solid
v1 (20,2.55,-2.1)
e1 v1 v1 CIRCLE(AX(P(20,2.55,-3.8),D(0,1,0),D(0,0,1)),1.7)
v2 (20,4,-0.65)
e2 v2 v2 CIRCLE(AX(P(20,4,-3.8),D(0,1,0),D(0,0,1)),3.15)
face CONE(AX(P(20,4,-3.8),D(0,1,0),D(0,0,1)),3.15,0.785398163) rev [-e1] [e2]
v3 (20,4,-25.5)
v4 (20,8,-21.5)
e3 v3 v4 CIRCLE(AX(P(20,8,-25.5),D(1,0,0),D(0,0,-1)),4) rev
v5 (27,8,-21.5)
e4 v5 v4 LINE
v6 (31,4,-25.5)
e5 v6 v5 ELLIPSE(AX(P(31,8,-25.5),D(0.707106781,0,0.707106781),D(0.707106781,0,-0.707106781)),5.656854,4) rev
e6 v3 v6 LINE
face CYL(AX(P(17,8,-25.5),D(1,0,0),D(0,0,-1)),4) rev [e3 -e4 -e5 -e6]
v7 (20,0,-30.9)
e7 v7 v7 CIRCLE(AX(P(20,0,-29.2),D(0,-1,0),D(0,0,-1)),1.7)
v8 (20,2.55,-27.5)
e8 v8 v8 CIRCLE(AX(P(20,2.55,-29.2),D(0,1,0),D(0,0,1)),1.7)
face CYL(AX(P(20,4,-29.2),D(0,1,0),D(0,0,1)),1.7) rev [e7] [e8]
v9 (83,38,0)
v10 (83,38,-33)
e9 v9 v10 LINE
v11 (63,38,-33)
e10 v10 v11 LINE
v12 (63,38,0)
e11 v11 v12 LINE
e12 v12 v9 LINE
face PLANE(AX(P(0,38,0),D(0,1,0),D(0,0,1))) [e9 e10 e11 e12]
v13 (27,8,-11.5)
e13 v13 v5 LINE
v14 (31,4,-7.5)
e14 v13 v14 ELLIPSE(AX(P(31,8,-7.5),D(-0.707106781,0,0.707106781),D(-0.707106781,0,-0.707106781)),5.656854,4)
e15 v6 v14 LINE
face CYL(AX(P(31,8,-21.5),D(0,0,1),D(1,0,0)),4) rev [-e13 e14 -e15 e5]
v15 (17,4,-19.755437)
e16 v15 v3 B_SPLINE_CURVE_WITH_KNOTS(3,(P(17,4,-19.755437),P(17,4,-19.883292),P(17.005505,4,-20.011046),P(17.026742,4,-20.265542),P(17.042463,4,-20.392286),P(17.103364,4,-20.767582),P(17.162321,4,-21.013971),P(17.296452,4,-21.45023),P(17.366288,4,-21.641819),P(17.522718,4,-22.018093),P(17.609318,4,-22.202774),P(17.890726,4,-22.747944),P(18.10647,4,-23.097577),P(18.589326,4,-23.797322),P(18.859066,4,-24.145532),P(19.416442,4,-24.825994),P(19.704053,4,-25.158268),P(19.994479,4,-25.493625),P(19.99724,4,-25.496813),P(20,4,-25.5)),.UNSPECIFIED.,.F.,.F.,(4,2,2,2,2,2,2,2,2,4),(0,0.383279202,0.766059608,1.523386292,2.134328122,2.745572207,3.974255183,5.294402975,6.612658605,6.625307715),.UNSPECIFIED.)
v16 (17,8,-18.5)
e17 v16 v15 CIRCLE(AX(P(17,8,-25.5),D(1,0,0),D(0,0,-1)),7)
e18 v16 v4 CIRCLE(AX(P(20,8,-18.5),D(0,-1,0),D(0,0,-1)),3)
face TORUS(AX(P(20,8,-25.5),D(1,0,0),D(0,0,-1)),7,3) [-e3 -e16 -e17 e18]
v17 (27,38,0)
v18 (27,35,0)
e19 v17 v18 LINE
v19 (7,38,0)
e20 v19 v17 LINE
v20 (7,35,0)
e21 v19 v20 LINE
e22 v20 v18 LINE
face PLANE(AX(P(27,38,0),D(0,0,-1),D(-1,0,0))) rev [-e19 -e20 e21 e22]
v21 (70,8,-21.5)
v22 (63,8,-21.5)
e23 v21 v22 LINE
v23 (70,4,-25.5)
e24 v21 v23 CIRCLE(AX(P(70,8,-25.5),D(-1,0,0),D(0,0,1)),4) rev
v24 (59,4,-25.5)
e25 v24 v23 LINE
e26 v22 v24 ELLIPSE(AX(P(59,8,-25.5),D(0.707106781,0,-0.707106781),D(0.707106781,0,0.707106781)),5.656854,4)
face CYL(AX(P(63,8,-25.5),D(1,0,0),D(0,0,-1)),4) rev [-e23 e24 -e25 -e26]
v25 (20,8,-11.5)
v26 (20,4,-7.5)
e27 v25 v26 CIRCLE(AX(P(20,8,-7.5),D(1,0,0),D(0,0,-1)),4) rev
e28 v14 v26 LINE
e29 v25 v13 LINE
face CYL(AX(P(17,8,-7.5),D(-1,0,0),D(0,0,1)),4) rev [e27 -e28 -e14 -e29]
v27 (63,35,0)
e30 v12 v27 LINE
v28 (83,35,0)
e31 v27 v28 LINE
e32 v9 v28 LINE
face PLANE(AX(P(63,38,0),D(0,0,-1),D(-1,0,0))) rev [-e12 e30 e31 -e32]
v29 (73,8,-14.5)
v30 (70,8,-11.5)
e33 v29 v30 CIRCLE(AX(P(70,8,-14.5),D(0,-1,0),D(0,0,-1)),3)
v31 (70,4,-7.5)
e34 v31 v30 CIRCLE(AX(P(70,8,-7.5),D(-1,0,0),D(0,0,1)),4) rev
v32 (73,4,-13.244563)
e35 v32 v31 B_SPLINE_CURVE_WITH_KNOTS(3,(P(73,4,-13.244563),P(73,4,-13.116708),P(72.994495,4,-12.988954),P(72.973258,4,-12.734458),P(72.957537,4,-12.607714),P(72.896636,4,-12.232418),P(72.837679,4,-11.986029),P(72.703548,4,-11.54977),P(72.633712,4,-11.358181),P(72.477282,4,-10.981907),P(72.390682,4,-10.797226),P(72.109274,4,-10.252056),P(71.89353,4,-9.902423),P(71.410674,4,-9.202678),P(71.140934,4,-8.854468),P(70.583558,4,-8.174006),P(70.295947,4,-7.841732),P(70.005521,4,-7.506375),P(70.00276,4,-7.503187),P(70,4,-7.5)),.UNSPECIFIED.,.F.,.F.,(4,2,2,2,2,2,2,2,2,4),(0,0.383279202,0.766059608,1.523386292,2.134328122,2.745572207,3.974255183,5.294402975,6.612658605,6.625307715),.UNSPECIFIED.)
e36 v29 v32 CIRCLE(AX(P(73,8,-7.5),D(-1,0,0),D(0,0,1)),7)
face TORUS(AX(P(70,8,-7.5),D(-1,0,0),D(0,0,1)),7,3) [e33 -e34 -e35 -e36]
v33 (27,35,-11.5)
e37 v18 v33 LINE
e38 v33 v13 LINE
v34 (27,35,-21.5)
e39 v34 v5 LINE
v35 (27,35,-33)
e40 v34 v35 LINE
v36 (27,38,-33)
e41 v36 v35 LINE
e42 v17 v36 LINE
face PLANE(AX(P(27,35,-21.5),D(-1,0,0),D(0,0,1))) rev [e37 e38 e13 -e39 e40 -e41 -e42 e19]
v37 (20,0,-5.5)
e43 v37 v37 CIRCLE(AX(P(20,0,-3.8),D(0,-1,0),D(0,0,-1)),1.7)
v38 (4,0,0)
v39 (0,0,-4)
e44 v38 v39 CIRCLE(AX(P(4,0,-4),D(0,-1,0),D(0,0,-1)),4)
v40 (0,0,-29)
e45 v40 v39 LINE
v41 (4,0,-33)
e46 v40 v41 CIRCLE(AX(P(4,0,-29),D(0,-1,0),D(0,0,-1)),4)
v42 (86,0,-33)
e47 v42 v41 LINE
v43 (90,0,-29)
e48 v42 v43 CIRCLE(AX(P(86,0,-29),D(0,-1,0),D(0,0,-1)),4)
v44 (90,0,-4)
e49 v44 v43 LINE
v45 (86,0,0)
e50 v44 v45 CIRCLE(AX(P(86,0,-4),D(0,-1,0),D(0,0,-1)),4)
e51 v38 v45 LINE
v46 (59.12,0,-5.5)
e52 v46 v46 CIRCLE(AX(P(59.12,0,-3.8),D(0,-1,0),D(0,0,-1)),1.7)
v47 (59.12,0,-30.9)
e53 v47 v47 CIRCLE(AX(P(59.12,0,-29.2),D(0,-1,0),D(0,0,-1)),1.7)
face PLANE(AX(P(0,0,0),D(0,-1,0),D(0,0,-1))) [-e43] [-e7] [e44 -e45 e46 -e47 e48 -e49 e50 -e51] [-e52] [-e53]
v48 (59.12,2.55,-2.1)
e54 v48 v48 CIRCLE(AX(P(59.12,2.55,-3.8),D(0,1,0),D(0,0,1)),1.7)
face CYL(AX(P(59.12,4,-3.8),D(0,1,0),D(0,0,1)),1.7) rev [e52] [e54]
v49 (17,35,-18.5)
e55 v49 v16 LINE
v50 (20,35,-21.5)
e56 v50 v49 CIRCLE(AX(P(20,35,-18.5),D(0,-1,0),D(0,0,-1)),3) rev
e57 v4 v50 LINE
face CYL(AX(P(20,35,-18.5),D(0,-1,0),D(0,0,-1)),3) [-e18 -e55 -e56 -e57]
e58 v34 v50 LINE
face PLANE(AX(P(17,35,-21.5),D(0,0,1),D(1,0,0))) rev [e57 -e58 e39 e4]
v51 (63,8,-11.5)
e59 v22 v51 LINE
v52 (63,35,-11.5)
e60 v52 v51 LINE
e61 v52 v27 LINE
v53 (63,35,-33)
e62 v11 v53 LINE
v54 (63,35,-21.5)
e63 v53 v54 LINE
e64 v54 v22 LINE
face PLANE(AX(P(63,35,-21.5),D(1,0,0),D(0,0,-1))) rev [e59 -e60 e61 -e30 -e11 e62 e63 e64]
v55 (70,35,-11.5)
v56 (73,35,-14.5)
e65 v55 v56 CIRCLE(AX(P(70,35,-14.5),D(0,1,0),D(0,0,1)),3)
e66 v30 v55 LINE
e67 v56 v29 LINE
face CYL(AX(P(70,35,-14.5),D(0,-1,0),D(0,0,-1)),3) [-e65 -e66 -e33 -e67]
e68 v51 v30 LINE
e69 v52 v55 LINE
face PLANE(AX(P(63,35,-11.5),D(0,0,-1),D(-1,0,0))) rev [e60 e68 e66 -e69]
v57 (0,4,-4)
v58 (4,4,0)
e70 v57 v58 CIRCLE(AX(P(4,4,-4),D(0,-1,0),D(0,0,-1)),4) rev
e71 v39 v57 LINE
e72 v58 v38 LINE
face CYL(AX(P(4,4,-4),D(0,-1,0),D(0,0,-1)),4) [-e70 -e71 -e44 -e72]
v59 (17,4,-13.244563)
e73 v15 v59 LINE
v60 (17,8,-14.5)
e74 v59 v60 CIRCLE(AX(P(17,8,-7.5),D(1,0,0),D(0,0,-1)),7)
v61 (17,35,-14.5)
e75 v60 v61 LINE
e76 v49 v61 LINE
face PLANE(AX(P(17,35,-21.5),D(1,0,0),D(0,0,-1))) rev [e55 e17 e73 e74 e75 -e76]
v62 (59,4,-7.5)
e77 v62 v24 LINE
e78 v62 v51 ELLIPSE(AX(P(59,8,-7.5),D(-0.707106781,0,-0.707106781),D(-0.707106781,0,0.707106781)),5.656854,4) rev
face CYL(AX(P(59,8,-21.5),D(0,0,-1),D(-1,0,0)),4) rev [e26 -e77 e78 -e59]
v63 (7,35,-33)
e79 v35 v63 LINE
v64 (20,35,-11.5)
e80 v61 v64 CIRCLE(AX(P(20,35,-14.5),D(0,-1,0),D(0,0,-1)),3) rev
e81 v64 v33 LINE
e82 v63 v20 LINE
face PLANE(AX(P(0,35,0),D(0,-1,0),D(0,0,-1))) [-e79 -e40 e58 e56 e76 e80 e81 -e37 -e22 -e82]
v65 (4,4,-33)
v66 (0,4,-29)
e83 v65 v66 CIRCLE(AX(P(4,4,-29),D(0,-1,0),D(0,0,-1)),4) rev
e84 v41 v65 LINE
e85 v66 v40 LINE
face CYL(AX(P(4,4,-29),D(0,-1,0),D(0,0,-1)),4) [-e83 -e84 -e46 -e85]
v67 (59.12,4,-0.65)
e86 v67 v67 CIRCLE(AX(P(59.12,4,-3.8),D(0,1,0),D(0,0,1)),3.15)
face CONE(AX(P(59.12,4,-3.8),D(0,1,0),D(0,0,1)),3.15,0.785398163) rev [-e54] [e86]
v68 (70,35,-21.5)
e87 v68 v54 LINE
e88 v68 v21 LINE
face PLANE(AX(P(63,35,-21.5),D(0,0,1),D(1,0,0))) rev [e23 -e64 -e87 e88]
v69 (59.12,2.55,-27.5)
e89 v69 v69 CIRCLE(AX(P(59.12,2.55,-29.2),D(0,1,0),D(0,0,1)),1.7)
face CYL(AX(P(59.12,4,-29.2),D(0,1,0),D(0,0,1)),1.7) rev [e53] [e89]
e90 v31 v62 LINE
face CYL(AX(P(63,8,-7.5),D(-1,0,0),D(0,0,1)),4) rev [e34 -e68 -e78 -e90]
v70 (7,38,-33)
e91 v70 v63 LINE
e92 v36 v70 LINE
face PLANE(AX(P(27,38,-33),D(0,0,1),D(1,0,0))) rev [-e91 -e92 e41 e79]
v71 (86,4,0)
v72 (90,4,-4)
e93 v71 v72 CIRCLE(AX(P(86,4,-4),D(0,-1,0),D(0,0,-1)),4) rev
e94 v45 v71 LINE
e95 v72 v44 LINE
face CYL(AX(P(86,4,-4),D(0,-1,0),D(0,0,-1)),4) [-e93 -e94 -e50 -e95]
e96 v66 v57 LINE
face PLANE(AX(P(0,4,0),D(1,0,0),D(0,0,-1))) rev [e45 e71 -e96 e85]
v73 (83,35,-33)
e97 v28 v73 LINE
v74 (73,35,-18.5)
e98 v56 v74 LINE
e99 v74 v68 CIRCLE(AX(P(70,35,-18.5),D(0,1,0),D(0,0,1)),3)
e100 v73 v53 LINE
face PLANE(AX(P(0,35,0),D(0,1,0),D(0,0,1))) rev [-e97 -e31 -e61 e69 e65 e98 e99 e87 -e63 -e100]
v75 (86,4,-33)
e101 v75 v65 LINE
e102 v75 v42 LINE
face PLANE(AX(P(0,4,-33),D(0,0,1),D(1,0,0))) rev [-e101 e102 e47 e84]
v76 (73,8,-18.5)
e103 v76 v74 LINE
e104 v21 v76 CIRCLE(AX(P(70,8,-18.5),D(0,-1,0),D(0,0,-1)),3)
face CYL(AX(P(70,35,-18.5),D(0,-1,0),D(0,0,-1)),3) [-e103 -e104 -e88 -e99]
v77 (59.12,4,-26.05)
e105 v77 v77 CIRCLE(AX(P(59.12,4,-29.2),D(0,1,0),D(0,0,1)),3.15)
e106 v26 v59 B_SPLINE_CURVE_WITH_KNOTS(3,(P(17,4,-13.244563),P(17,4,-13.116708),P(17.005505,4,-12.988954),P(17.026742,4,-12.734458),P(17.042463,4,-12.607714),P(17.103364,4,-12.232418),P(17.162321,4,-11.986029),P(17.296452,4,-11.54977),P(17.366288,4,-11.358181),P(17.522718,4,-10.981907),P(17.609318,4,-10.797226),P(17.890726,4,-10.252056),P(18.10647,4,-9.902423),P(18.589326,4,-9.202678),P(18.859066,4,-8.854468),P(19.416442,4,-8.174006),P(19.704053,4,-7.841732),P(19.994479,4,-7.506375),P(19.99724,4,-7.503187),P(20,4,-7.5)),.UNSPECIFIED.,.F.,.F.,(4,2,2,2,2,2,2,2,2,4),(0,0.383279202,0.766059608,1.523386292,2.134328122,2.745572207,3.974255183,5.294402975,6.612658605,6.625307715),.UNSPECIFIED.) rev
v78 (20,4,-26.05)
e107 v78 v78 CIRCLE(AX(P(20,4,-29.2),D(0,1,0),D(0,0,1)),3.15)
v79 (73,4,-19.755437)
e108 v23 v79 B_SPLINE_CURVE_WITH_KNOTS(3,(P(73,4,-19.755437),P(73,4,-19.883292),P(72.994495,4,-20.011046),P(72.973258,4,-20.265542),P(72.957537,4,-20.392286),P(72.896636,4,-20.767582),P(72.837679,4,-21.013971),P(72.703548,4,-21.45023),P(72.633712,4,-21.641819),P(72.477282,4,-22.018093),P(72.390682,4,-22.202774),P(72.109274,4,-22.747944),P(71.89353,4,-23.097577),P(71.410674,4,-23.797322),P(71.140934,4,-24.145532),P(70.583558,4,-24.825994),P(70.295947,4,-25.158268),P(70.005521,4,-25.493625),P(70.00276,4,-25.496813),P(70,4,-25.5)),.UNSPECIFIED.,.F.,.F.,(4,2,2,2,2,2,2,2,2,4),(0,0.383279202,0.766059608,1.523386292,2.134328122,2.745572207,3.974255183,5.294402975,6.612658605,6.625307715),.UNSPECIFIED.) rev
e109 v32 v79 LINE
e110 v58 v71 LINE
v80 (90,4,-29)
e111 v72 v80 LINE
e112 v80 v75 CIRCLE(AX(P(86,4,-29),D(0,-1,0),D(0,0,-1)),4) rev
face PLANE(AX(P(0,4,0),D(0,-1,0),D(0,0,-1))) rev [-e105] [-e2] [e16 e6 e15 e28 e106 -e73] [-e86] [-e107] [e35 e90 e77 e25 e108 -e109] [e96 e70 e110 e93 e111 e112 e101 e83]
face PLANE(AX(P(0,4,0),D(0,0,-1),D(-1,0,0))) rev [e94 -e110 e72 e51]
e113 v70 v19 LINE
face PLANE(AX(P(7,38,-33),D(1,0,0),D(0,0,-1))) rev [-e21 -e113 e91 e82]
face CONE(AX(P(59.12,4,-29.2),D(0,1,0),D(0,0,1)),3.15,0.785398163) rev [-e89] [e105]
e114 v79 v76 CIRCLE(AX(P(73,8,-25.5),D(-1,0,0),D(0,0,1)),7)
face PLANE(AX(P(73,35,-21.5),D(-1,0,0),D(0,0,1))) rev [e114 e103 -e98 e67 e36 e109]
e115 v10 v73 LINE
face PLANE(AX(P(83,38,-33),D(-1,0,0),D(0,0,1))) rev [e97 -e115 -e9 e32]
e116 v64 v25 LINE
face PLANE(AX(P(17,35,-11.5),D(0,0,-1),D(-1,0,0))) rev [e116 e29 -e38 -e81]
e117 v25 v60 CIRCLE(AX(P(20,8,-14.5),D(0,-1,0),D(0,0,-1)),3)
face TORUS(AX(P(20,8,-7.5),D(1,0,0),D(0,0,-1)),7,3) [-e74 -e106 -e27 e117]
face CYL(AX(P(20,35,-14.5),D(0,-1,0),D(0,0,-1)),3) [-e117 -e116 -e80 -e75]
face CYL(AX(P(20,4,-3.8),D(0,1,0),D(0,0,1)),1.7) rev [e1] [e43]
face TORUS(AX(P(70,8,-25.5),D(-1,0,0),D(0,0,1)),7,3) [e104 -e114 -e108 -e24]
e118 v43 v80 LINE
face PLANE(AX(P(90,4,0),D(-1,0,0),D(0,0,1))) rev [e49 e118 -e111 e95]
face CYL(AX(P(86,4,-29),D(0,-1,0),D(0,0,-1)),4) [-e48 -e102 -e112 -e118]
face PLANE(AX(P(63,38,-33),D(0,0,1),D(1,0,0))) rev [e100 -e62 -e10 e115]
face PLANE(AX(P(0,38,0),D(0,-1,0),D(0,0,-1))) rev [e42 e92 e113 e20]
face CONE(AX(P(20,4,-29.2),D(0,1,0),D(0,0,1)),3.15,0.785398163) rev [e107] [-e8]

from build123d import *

# Parameters (mm, degrees)
ESQUISSE1_W                                    = 90
ESQUISSE1_H                                    = 33
BOSS_EXTRU_1_DEPTH                             = 4
ESQUISSE2_R                                    = 1.5
ENL_V_MAT_EXTRU_1_DEPTH                        = 4
ESQUISSE3_W                                    = 10
ESQUISSE3_H                                    = 10
BOSS_EXTRU_2_DEPTH                             = 31
ESQUISSE4_W                                    = 20
ESQUISSE4_H                                    = 33
BOSS_EXTRU_3_DEPTH                             = 3
CONG_1_R                                       = 4
FRAISAGE_POUR_VIS_T_TE_FRAIS_E_M31_D           = 3.4
FRAISAGE_POUR_VIS_T_TE_FRAIS_E_M31_DEPTH       = 10
FRAISAGE_POUR_VIS_T_TE_FRAIS_E_M31_CSINK_D     = 6.3
FRAISAGE_POUR_VIS_T_TE_FRAIS_E_M31_CSINK_ANGLE = 90
FRAISAGE_POUR_VIS_T_TE_FRAIS_E_M31_TIP         = 1.021463052
CONG_2_R                                       = 3


with BuildPart() as part:
    # Esquisse1 → Boss.-Extru.1 (new body)
    with BuildSketch(Plane(origin=(0, 0, 0), x_dir=(1, 0, 0), z_dir=(0, 1, 0))):
        with Locations((45, 16.5)):
            Rectangle(ESQUISSE1_W, ESQUISSE1_H)
    extrude(amount=BOSS_EXTRU_1_DEPTH)

    # Esquisse2 → Enlèv. mat.-Extru.1 (cut)
    with BuildSketch(Plane(origin=(0, 4, 0), x_dir=(1, 0, 0), z_dir=(0, 1, 0))):
        with Locations(Location((20, 29.2, 0), (0, 0, 270))):
            Circle(ESQUISSE2_R)
        with Locations(Location((59.12, 29.2, 0), (0, 0, 270))):
            Circle(ESQUISSE2_R)
        with Locations(Location((59.12, 3.8, 0), (0, 0, 270))):
            Circle(ESQUISSE2_R)
        with Locations(Location((20, 3.8, 0), (0, 0, 270))):
            Circle(ESQUISSE2_R)
    extrude(amount=-ENL_V_MAT_EXTRU_1_DEPTH, mode=Mode.SUBTRACT)

    # Esquisse3 → Boss.-Extru.2 (add)
    with BuildSketch(Plane(origin=(0, 4, 0), x_dir=(1, 0, 0), z_dir=(0, 1, 0))):
        with Locations((22, 16.5)):
            Rectangle(ESQUISSE3_W, ESQUISSE3_H)
        with Locations((68, 16.5)):
            Rectangle(ESQUISSE3_W, ESQUISSE3_H)
    extrude(amount=BOSS_EXTRU_2_DEPTH)

    # Esquisse4 → Boss.-Extru.3 (add)
    with BuildSketch(Plane(origin=(0, 35, 0), x_dir=(1, 0, 0), z_dir=(0, 1, 0))):
        with Locations((17, 16.5)):
            Rectangle(ESQUISSE4_W, ESQUISSE4_H)
        with Locations((73, 16.5)):
            Rectangle(ESQUISSE4_W, ESQUISSE4_H)
    extrude(amount=BOSS_EXTRU_3_DEPTH)

    # Congé1
    cong_1_edges = [part.edges().sort_by_distance(p)[0] for p in [
        (22, 4, -11.5),
        (27, 4, -16.5),
        (22, 4, -21.5),
        (63, 4, -16.5),
        (68, 4, -11.5),
        (68, 4, -21.5),
        (0, 2, -33),
        (90, 2, -33),
        (90, 2, 0),
        (0, 2, 0),
    ]]
    fillet(cong_1_edges, radius=CONG_1_R)

    # Fraisage pour vis à tête fraisée M31
    with Locations(Plane(origin=(0, 4, 0), x_dir=(1, 0, 0), z_dir=(0, 1, 0))):
        with Locations((59.12, 3.8), (59.12, 29.2), (20, 3.8), (20, 29.2)):
            CounterSinkHole(FRAISAGE_POUR_VIS_T_TE_FRAIS_E_M31_D / 2, FRAISAGE_POUR_VIS_T_TE_FRAIS_E_M31_CSINK_D / 2, depth=FRAISAGE_POUR_VIS_T_TE_FRAIS_E_M31_DEPTH, counter_sink_angle=FRAISAGE_POUR_VIS_T_TE_FRAIS_E_M31_CSINK_ANGLE)
            with Locations((0, 0, -(FRAISAGE_POUR_VIS_T_TE_FRAIS_E_M31_DEPTH + FRAISAGE_POUR_VIS_T_TE_FRAIS_E_M31_TIP / 2))):  # 118° drill point
                Cone(0, FRAISAGE_POUR_VIS_T_TE_FRAIS_E_M31_D / 2, FRAISAGE_POUR_VIS_T_TE_FRAIS_E_M31_TIP, mode=Mode.SUBTRACT)

    # Congé2
    # the kernel refuses this fillet: 3 mm, written as the material it takes off along each edge
    with BuildSketch(Plane(origin=(17, 8, -25.5), x_dir=(0, 0, 1), z_dir=(0, 1, 0))) as cong_2_piece_1_section:
        with BuildLine():
            CenterArc((4 + CONG_2_R, CONG_2_R), CONG_2_R, 180, 90)
            Line((4, CONG_2_R), (4, 0))
            Line((4, 0), (4 + CONG_2_R, 0))
        make_face()
    cong_2_piece_1 = revolve(axis=Axis((17, 8, -25.5), (1, 0, 0)), revolution_arc=197.472741928, mode=Mode.PRIVATE)
    cong_2_piece_1 = split(cong_2_piece_1, bisect_by=Plane(origin=(17, 4, -25.5), z_dir=(0, 1, 0)), keep=Keep.TOP, mode=Mode.PRIVATE)
    add(cong_2_piece_1, mode=Mode.SUBTRACT)
    with BuildSketch(Plane(origin=(73, 8, -25.5), x_dir=(0, 0.3002520412299313, -0.9538599015249879), z_dir=(0, 0.9538599015249879, 0.3002520412299313))) as cong_2_piece_2_section:
        with BuildLine():
            CenterArc((4 + CONG_2_R, CONG_2_R), CONG_2_R, 180, 90)
            Line((4, CONG_2_R), (4, 0))
            Line((4, 0), (4 + CONG_2_R, 0))
        make_face()
    cong_2_piece_2 = revolve(axis=Axis((73, 8, -25.5), (-1, 0, 0)), revolution_arc=197.472741928, mode=Mode.PRIVATE)
    cong_2_piece_2 = split(cong_2_piece_2, bisect_by=Plane(origin=(73, 4, -25.5), z_dir=(0, 1, 0)), keep=Keep.TOP, mode=Mode.PRIVATE)
    add(cong_2_piece_2, mode=Mode.SUBTRACT)
    with BuildSketch(Plane(origin=(73, 8, -7.5), x_dir=(0, 0.30025204122993077, 0.9538599015249881), z_dir=(0, 0.9538599015249881, -0.30025204122993077))) as cong_2_piece_3_section:
        with BuildLine():
            CenterArc((4 + CONG_2_R, -CONG_2_R), CONG_2_R, 90, 90)
            Line((4, -CONG_2_R), (4, 0))
            Line((4, 0), (4 + CONG_2_R, 0))
        make_face()
    cong_2_piece_3 = revolve(axis=Axis((73, 8, -7.5), (1, 0, 0)), revolution_arc=197.472741928, mode=Mode.PRIVATE)
    cong_2_piece_3 = split(cong_2_piece_3, bisect_by=Plane(origin=(73, 4, -7.5), z_dir=(0, 1, 0)), keep=Keep.TOP, mode=Mode.PRIVATE)
    add(cong_2_piece_3, mode=Mode.SUBTRACT)
    with BuildSketch(Plane(origin=(17, 8, -7.5), x_dir=(0, 0, -1), z_dir=(0, 1, 0))) as cong_2_piece_4_section:
        with BuildLine():
            CenterArc((4 + CONG_2_R, -CONG_2_R), CONG_2_R, 90, 90)
            Line((4, -CONG_2_R), (4, 0))
            Line((4, 0), (4 + CONG_2_R, 0))
        make_face()
    cong_2_piece_4 = revolve(axis=Axis((17, 8, -7.5), (-1, 0, 0)), revolution_arc=197.472741928, mode=Mode.PRIVATE)
    cong_2_piece_4 = split(cong_2_piece_4, bisect_by=Plane(origin=(17, 4, -7.5), z_dir=(0, 1, 0)), keep=Keep.TOP, mode=Mode.PRIVATE)
    add(cong_2_piece_4, mode=Mode.SUBTRACT)
    with BuildSketch(Plane(origin=(17, 8, -21.5), x_dir=(0, 0, 1), z_dir=(0, 1, 0)), Plane(origin=(17, 8, -11.5), x_dir=(1, 0, 0), z_dir=(0, 1, 0)), Plane(origin=(73, 8, -11.5), x_dir=(0, 0, -1), z_dir=(0, 1, 0))) as cong_2_piece_5:
        with BuildLine():
            CenterArc((CONG_2_R, CONG_2_R), CONG_2_R, 180, 90)
            Line((0, CONG_2_R), (0, 0))
            Line((0, 0), (CONG_2_R, 0))
        make_face()
    extrude(amount=27, mode=Mode.SUBTRACT)
    with BuildSketch(Plane(origin=(73, 8, -21.5), x_dir=(0, 0, 1), z_dir=(0, 1, 0))) as cong_2_piece_6:
        with BuildLine():
            CenterArc((CONG_2_R, -CONG_2_R), CONG_2_R, 90, 90)
            Line((0, -CONG_2_R), (0, 0))
            Line((0, 0), (CONG_2_R, 0))
        make_face()
    extrude(amount=27, mode=Mode.SUBTRACT)


solid = part.part
